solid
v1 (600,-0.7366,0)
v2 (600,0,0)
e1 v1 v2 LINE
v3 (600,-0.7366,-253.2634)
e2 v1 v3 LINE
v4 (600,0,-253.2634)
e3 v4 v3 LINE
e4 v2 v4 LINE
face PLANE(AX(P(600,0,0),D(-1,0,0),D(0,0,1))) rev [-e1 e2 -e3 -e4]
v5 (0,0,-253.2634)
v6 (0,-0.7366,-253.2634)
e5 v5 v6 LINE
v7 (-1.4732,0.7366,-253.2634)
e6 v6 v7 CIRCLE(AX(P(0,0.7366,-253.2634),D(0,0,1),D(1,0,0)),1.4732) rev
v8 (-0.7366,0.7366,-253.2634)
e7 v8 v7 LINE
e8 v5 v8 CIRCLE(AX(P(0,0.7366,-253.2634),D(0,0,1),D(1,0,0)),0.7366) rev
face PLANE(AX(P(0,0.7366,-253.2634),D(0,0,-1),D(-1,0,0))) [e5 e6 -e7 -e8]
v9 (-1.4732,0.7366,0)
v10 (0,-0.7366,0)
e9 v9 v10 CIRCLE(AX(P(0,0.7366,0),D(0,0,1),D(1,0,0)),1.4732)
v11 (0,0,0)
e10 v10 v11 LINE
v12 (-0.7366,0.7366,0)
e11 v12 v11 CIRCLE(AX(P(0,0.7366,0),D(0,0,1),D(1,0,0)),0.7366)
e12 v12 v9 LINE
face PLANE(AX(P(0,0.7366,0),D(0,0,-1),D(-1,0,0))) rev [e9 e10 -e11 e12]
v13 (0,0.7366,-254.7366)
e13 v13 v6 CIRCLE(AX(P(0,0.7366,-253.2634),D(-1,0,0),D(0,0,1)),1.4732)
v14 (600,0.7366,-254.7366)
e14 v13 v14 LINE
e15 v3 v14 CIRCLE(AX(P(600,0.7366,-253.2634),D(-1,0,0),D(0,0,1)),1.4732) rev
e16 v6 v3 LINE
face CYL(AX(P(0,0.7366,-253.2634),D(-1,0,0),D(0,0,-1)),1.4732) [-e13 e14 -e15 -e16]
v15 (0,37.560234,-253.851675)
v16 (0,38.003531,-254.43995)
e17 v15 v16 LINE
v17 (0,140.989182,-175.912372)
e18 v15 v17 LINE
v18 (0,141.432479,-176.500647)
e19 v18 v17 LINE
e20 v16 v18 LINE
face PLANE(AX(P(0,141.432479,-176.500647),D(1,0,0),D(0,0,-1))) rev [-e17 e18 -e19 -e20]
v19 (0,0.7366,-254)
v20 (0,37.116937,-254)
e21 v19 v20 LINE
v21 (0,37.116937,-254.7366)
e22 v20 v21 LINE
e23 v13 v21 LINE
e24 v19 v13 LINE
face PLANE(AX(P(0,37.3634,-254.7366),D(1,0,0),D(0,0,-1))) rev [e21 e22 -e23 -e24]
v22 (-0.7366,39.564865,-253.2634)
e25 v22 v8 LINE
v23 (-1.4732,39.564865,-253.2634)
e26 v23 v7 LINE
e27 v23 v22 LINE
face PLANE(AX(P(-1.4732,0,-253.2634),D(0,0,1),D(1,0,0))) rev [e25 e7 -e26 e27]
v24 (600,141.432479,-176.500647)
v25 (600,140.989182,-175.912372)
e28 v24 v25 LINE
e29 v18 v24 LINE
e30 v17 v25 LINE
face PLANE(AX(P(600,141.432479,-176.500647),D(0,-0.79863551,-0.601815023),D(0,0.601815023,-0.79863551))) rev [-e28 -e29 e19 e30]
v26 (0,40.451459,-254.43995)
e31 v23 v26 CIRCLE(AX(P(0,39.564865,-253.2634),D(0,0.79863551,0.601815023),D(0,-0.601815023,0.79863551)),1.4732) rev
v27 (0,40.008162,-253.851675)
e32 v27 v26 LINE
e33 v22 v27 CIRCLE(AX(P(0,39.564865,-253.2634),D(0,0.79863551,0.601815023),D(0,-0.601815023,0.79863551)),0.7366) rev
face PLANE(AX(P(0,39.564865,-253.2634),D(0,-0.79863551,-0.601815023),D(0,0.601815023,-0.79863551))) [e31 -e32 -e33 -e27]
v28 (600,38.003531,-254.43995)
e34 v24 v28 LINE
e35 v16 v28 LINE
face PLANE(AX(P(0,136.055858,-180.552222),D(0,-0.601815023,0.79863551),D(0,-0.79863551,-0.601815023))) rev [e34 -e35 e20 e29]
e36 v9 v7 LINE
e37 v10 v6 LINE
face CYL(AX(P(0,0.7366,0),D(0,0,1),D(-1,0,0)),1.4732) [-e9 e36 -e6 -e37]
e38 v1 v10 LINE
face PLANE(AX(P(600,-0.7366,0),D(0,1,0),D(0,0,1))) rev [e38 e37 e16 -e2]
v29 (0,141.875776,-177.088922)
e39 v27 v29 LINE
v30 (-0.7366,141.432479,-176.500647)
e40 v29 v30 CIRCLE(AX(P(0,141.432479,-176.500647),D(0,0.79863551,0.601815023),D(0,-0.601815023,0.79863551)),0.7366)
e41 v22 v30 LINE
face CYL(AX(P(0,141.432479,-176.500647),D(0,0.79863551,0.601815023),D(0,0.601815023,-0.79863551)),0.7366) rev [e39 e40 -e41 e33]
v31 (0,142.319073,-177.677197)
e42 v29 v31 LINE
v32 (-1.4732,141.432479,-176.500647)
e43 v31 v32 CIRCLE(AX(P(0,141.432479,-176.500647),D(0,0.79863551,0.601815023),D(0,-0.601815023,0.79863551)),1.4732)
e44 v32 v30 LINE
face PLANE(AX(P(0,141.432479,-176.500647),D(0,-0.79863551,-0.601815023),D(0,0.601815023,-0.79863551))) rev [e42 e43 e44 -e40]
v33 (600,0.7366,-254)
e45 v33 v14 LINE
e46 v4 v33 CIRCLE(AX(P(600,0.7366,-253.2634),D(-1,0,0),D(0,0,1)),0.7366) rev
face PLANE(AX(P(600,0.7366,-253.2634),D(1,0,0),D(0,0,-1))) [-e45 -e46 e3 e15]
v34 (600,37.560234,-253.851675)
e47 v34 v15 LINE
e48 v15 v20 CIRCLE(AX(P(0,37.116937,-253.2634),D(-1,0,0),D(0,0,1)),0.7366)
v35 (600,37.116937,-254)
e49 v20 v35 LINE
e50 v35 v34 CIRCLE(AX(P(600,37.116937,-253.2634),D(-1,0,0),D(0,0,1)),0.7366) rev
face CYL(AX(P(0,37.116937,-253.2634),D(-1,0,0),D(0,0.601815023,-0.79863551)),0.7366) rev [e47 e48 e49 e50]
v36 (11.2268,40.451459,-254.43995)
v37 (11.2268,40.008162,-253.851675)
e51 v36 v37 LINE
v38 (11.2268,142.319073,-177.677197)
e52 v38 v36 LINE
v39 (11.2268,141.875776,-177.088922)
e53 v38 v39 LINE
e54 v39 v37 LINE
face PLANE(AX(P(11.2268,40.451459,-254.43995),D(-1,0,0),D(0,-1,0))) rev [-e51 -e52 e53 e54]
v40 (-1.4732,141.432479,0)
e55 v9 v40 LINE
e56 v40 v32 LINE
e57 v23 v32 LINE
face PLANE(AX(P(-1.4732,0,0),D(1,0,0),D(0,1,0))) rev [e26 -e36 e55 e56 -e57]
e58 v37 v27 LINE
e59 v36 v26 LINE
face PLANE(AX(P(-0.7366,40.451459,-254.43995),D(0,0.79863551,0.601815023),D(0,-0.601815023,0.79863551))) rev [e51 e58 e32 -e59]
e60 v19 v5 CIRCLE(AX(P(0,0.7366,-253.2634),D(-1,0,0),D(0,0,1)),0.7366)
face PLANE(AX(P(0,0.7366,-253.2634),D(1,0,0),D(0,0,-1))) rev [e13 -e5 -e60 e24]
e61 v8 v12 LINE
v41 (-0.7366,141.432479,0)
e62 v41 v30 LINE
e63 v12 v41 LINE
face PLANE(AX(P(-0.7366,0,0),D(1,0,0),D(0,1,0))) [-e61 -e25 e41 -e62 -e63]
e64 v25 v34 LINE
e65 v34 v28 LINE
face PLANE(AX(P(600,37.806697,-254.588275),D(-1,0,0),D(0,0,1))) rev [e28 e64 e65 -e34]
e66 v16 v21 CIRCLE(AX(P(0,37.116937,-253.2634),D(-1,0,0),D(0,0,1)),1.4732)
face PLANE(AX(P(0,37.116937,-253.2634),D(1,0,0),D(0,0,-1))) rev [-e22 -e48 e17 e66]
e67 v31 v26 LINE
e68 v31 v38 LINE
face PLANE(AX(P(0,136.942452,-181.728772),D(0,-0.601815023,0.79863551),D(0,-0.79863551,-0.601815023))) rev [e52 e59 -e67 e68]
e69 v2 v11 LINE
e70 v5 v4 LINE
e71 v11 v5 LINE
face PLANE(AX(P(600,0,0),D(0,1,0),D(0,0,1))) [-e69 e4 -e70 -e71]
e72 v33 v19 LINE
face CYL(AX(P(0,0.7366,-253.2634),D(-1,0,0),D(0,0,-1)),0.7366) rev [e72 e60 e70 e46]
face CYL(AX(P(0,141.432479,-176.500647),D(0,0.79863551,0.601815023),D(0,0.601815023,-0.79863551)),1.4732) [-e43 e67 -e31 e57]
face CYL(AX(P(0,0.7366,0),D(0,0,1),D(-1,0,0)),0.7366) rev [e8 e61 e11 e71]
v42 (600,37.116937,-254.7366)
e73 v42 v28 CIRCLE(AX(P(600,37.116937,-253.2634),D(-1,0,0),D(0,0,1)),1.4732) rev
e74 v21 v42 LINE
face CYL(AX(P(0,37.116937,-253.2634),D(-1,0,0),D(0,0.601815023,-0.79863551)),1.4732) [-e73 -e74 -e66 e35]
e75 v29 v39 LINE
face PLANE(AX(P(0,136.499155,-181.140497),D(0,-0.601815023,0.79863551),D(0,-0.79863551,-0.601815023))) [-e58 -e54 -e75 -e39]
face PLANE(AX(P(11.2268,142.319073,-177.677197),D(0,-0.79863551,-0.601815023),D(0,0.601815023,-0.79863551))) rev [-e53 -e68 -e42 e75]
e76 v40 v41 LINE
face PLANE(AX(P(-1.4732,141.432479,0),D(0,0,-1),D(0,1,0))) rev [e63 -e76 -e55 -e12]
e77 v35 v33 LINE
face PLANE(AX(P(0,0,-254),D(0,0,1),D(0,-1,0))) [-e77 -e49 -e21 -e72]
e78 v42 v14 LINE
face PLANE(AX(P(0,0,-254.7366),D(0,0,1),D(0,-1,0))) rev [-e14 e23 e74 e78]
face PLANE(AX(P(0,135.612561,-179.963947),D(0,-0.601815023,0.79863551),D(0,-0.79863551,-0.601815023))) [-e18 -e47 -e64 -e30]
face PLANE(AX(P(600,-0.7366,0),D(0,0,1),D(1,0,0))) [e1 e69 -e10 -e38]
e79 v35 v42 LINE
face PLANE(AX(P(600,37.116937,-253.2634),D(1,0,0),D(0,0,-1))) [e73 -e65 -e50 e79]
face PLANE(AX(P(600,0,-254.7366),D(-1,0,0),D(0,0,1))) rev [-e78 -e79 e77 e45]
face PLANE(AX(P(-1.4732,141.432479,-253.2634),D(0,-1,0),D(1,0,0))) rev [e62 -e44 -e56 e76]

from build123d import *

# Parameters (mm, degrees)
SKETCH2_W                    = 254
SKETCH2_H                    = 0.7366
BASE_FLANGE1_DEPTH           = 600
EDGE_FLANGE1_STRIP_W         = 4.4196
EDGE_FLANGE1_STRIP_H         = 0.7366
EDGE_FLANGE1_STRIP_CUT_DEPTH = 600
EDGE_FLANGE1_DEPTH           = 600
EDGE_FLANGE2_STRIP_CUT_DEPTH = 600
EDGE_FLANGE2_DEPTH           = 600
EDGE_FLANGE3_DEPTH           = 253.2634
CUT_EXTRUDE1_DEPTH           = 669.329179279
EDGE_FLANGE4_DEPTH           = 127.552071744


# Sheet-metal steps are written as plain solids
with BuildPart() as part:
    # Sketch2 → Base-Flange1 (new body)
    with BuildSketch(Plane(origin=(0, 0, 0), x_dir=(0, 0, -1), z_dir=(1, 0, 0))):
        with Locations((127, -0.3683)):
            Rectangle(SKETCH2_W, SKETCH2_H)
    extrude(amount=BASE_FLANGE1_DEPTH)

    # Edge-Flange1 strip (across the edge) → Edge-Flange1 strip cut (cut)
    with BuildSketch(Plane(origin=(600, 0, -254), x_dir=(0, 0, 1), z_dir=(-1, 0, 0))):
        with Locations((-1.4732, -0.3683)):
            Rectangle(EDGE_FLANGE1_STRIP_W, EDGE_FLANGE1_STRIP_H)
    extrude(amount=EDGE_FLANGE1_STRIP_CUT_DEPTH, mode=Mode.SUBTRACT)

    # Edge-Flange1 section (across the edge) → Edge-Flange1 (add)
    with BuildSketch(Plane(origin=(600, 0, -254), x_dir=(0, 0, 1), z_dir=(-1, 0, 0))):
        with BuildLine():
            Line((-0.7366, 0.7366), (-0.7366, 37.3634))
            Line((-0.7366, 37.3634), (0, 37.3634))
            Line((0, 37.3634), (0, 0.7366))
            ThreePointArc((0, 0.7366), (0.215745145, 0.215745145), (0.7366, 0))
            Line((0.7366, 0), (0.7366, -0.7366))
            ThreePointArc((0.7366, -0.7366), (-0.30510971, -0.30510971), (-0.7366, 0.7366))
        make_face()
    extrude(amount=EDGE_FLANGE1_DEPTH)

    # Edge-Flange2 strip (across the edge) → Edge-Flange2 strip cut (cut)
    with BuildSketch(Plane(origin=(600, 37.3634, -254), x_dir=(0, -0.6018150231520416, 0.7986355100472979), z_dir=(-1, 0, 0))):
        Polygon((-3.09973151, 2.88951852), (-0.439949833, -0.64013098), (0.148325083, -0.196834034), (-2.511456593, 3.332815466), align=None)
    extrude(amount=EDGE_FLANGE2_STRIP_CUT_DEPTH, mode=Mode.SUBTRACT)

    # Edge-Flange2 section (across the edge) → Edge-Flange2 (add)
    with BuildSketch(Plane(origin=(600, 37.3634, -254), x_dir=(0, -0.6018150231520416, 0.7986355100472979), z_dir=(-1, 0, 0))):
        with BuildLine():
            Line((-0.7366, 0.246462912), (-0.7366, 129.753537088))
            Line((-0.7366, 129.753537088), (0, 129.753537088))
            Line((0, 129.753537088), (0, 0.246462912))
            ThreePointArc((0, 0.246462912), (0.038064796, 0.012736302), (0.148325083, -0.196834034))
            Line((0.148325083, -0.196834034), (-0.439949833, -0.64013098))
            ThreePointArc((-0.439949833, -0.64013098), (-0.660470409, -0.220990307), (-0.7366, 0.246462912))
        make_face()
    extrude(amount=EDGE_FLANGE2_DEPTH)

    # Edge-Flange3 section (across the edge) → Edge-Flange3 (add)
    with BuildSketch(Plane(origin=(-0.7366, 0, -253.2634), x_dir=(1, 0, 0), z_dir=(0, 0, 1))):
        with BuildLine():
            Line((-0.7366, 0.7366), (-0.7366, 141.432479218))
            Line((-0.7366, 141.432479218), (0, 141.432479218))
            Line((0, 141.432479218), (0, 0.7366))
            ThreePointArc((0, 0.7366), (0.215745145, 0.215745145), (0.7366, 0))
            Line((0.7366, 0), (0.7366, -0.7366))
            ThreePointArc((0.7366, -0.7366), (-0.30510971, -0.30510971), (-0.7366, 0.7366))
        make_face()
    extrude(amount=EDGE_FLANGE3_DEPTH)

    # Sketch16 → Cut-Extrude1 (cut, through all)
    with BuildSketch(Plane.ZY.offset(1.4732)):
        Polygon((-254.439949833, 38.00353098), (-176.50064699, 141.432479218), (-254.439949833, 141.432479218), align=None)
    extrude(amount=-CUT_EXTRUDE1_DEPTH, mode=Mode.SUBTRACT)

    # Edge-Flange4 section (across the edge) → Edge-Flange4 (add)
    with BuildSketch(Plane(origin=(-0.7366, 40.00816229, -253.851674917), x_dir=(5.5927072616139335e-15, -0.6018150231520416, 0.7986355100472979), z_dir=(-2.7888745978675463e-15, 0.7986355100472979, 0.6018150231520416))):
        with BuildLine():
            Line((-0.7366, 0.7366), (-0.7366, 11.9634))
            Line((-0.7366, 11.9634), (0, 11.9634))
            Line((0, 11.9634), (0, 0.7366))
            ThreePointArc((0, 0.7366), (0.215745145, 0.215745145), (0.7366, 0))
            Line((0.7366, 0), (0.7366, -0.7366))
            ThreePointArc((0.7366, -0.7366), (-0.30510971, -0.30510971), (-0.7366, 0.7366))
        make_face()
    extrude(amount=EDGE_FLANGE4_DEPTH)


solid = part.part
